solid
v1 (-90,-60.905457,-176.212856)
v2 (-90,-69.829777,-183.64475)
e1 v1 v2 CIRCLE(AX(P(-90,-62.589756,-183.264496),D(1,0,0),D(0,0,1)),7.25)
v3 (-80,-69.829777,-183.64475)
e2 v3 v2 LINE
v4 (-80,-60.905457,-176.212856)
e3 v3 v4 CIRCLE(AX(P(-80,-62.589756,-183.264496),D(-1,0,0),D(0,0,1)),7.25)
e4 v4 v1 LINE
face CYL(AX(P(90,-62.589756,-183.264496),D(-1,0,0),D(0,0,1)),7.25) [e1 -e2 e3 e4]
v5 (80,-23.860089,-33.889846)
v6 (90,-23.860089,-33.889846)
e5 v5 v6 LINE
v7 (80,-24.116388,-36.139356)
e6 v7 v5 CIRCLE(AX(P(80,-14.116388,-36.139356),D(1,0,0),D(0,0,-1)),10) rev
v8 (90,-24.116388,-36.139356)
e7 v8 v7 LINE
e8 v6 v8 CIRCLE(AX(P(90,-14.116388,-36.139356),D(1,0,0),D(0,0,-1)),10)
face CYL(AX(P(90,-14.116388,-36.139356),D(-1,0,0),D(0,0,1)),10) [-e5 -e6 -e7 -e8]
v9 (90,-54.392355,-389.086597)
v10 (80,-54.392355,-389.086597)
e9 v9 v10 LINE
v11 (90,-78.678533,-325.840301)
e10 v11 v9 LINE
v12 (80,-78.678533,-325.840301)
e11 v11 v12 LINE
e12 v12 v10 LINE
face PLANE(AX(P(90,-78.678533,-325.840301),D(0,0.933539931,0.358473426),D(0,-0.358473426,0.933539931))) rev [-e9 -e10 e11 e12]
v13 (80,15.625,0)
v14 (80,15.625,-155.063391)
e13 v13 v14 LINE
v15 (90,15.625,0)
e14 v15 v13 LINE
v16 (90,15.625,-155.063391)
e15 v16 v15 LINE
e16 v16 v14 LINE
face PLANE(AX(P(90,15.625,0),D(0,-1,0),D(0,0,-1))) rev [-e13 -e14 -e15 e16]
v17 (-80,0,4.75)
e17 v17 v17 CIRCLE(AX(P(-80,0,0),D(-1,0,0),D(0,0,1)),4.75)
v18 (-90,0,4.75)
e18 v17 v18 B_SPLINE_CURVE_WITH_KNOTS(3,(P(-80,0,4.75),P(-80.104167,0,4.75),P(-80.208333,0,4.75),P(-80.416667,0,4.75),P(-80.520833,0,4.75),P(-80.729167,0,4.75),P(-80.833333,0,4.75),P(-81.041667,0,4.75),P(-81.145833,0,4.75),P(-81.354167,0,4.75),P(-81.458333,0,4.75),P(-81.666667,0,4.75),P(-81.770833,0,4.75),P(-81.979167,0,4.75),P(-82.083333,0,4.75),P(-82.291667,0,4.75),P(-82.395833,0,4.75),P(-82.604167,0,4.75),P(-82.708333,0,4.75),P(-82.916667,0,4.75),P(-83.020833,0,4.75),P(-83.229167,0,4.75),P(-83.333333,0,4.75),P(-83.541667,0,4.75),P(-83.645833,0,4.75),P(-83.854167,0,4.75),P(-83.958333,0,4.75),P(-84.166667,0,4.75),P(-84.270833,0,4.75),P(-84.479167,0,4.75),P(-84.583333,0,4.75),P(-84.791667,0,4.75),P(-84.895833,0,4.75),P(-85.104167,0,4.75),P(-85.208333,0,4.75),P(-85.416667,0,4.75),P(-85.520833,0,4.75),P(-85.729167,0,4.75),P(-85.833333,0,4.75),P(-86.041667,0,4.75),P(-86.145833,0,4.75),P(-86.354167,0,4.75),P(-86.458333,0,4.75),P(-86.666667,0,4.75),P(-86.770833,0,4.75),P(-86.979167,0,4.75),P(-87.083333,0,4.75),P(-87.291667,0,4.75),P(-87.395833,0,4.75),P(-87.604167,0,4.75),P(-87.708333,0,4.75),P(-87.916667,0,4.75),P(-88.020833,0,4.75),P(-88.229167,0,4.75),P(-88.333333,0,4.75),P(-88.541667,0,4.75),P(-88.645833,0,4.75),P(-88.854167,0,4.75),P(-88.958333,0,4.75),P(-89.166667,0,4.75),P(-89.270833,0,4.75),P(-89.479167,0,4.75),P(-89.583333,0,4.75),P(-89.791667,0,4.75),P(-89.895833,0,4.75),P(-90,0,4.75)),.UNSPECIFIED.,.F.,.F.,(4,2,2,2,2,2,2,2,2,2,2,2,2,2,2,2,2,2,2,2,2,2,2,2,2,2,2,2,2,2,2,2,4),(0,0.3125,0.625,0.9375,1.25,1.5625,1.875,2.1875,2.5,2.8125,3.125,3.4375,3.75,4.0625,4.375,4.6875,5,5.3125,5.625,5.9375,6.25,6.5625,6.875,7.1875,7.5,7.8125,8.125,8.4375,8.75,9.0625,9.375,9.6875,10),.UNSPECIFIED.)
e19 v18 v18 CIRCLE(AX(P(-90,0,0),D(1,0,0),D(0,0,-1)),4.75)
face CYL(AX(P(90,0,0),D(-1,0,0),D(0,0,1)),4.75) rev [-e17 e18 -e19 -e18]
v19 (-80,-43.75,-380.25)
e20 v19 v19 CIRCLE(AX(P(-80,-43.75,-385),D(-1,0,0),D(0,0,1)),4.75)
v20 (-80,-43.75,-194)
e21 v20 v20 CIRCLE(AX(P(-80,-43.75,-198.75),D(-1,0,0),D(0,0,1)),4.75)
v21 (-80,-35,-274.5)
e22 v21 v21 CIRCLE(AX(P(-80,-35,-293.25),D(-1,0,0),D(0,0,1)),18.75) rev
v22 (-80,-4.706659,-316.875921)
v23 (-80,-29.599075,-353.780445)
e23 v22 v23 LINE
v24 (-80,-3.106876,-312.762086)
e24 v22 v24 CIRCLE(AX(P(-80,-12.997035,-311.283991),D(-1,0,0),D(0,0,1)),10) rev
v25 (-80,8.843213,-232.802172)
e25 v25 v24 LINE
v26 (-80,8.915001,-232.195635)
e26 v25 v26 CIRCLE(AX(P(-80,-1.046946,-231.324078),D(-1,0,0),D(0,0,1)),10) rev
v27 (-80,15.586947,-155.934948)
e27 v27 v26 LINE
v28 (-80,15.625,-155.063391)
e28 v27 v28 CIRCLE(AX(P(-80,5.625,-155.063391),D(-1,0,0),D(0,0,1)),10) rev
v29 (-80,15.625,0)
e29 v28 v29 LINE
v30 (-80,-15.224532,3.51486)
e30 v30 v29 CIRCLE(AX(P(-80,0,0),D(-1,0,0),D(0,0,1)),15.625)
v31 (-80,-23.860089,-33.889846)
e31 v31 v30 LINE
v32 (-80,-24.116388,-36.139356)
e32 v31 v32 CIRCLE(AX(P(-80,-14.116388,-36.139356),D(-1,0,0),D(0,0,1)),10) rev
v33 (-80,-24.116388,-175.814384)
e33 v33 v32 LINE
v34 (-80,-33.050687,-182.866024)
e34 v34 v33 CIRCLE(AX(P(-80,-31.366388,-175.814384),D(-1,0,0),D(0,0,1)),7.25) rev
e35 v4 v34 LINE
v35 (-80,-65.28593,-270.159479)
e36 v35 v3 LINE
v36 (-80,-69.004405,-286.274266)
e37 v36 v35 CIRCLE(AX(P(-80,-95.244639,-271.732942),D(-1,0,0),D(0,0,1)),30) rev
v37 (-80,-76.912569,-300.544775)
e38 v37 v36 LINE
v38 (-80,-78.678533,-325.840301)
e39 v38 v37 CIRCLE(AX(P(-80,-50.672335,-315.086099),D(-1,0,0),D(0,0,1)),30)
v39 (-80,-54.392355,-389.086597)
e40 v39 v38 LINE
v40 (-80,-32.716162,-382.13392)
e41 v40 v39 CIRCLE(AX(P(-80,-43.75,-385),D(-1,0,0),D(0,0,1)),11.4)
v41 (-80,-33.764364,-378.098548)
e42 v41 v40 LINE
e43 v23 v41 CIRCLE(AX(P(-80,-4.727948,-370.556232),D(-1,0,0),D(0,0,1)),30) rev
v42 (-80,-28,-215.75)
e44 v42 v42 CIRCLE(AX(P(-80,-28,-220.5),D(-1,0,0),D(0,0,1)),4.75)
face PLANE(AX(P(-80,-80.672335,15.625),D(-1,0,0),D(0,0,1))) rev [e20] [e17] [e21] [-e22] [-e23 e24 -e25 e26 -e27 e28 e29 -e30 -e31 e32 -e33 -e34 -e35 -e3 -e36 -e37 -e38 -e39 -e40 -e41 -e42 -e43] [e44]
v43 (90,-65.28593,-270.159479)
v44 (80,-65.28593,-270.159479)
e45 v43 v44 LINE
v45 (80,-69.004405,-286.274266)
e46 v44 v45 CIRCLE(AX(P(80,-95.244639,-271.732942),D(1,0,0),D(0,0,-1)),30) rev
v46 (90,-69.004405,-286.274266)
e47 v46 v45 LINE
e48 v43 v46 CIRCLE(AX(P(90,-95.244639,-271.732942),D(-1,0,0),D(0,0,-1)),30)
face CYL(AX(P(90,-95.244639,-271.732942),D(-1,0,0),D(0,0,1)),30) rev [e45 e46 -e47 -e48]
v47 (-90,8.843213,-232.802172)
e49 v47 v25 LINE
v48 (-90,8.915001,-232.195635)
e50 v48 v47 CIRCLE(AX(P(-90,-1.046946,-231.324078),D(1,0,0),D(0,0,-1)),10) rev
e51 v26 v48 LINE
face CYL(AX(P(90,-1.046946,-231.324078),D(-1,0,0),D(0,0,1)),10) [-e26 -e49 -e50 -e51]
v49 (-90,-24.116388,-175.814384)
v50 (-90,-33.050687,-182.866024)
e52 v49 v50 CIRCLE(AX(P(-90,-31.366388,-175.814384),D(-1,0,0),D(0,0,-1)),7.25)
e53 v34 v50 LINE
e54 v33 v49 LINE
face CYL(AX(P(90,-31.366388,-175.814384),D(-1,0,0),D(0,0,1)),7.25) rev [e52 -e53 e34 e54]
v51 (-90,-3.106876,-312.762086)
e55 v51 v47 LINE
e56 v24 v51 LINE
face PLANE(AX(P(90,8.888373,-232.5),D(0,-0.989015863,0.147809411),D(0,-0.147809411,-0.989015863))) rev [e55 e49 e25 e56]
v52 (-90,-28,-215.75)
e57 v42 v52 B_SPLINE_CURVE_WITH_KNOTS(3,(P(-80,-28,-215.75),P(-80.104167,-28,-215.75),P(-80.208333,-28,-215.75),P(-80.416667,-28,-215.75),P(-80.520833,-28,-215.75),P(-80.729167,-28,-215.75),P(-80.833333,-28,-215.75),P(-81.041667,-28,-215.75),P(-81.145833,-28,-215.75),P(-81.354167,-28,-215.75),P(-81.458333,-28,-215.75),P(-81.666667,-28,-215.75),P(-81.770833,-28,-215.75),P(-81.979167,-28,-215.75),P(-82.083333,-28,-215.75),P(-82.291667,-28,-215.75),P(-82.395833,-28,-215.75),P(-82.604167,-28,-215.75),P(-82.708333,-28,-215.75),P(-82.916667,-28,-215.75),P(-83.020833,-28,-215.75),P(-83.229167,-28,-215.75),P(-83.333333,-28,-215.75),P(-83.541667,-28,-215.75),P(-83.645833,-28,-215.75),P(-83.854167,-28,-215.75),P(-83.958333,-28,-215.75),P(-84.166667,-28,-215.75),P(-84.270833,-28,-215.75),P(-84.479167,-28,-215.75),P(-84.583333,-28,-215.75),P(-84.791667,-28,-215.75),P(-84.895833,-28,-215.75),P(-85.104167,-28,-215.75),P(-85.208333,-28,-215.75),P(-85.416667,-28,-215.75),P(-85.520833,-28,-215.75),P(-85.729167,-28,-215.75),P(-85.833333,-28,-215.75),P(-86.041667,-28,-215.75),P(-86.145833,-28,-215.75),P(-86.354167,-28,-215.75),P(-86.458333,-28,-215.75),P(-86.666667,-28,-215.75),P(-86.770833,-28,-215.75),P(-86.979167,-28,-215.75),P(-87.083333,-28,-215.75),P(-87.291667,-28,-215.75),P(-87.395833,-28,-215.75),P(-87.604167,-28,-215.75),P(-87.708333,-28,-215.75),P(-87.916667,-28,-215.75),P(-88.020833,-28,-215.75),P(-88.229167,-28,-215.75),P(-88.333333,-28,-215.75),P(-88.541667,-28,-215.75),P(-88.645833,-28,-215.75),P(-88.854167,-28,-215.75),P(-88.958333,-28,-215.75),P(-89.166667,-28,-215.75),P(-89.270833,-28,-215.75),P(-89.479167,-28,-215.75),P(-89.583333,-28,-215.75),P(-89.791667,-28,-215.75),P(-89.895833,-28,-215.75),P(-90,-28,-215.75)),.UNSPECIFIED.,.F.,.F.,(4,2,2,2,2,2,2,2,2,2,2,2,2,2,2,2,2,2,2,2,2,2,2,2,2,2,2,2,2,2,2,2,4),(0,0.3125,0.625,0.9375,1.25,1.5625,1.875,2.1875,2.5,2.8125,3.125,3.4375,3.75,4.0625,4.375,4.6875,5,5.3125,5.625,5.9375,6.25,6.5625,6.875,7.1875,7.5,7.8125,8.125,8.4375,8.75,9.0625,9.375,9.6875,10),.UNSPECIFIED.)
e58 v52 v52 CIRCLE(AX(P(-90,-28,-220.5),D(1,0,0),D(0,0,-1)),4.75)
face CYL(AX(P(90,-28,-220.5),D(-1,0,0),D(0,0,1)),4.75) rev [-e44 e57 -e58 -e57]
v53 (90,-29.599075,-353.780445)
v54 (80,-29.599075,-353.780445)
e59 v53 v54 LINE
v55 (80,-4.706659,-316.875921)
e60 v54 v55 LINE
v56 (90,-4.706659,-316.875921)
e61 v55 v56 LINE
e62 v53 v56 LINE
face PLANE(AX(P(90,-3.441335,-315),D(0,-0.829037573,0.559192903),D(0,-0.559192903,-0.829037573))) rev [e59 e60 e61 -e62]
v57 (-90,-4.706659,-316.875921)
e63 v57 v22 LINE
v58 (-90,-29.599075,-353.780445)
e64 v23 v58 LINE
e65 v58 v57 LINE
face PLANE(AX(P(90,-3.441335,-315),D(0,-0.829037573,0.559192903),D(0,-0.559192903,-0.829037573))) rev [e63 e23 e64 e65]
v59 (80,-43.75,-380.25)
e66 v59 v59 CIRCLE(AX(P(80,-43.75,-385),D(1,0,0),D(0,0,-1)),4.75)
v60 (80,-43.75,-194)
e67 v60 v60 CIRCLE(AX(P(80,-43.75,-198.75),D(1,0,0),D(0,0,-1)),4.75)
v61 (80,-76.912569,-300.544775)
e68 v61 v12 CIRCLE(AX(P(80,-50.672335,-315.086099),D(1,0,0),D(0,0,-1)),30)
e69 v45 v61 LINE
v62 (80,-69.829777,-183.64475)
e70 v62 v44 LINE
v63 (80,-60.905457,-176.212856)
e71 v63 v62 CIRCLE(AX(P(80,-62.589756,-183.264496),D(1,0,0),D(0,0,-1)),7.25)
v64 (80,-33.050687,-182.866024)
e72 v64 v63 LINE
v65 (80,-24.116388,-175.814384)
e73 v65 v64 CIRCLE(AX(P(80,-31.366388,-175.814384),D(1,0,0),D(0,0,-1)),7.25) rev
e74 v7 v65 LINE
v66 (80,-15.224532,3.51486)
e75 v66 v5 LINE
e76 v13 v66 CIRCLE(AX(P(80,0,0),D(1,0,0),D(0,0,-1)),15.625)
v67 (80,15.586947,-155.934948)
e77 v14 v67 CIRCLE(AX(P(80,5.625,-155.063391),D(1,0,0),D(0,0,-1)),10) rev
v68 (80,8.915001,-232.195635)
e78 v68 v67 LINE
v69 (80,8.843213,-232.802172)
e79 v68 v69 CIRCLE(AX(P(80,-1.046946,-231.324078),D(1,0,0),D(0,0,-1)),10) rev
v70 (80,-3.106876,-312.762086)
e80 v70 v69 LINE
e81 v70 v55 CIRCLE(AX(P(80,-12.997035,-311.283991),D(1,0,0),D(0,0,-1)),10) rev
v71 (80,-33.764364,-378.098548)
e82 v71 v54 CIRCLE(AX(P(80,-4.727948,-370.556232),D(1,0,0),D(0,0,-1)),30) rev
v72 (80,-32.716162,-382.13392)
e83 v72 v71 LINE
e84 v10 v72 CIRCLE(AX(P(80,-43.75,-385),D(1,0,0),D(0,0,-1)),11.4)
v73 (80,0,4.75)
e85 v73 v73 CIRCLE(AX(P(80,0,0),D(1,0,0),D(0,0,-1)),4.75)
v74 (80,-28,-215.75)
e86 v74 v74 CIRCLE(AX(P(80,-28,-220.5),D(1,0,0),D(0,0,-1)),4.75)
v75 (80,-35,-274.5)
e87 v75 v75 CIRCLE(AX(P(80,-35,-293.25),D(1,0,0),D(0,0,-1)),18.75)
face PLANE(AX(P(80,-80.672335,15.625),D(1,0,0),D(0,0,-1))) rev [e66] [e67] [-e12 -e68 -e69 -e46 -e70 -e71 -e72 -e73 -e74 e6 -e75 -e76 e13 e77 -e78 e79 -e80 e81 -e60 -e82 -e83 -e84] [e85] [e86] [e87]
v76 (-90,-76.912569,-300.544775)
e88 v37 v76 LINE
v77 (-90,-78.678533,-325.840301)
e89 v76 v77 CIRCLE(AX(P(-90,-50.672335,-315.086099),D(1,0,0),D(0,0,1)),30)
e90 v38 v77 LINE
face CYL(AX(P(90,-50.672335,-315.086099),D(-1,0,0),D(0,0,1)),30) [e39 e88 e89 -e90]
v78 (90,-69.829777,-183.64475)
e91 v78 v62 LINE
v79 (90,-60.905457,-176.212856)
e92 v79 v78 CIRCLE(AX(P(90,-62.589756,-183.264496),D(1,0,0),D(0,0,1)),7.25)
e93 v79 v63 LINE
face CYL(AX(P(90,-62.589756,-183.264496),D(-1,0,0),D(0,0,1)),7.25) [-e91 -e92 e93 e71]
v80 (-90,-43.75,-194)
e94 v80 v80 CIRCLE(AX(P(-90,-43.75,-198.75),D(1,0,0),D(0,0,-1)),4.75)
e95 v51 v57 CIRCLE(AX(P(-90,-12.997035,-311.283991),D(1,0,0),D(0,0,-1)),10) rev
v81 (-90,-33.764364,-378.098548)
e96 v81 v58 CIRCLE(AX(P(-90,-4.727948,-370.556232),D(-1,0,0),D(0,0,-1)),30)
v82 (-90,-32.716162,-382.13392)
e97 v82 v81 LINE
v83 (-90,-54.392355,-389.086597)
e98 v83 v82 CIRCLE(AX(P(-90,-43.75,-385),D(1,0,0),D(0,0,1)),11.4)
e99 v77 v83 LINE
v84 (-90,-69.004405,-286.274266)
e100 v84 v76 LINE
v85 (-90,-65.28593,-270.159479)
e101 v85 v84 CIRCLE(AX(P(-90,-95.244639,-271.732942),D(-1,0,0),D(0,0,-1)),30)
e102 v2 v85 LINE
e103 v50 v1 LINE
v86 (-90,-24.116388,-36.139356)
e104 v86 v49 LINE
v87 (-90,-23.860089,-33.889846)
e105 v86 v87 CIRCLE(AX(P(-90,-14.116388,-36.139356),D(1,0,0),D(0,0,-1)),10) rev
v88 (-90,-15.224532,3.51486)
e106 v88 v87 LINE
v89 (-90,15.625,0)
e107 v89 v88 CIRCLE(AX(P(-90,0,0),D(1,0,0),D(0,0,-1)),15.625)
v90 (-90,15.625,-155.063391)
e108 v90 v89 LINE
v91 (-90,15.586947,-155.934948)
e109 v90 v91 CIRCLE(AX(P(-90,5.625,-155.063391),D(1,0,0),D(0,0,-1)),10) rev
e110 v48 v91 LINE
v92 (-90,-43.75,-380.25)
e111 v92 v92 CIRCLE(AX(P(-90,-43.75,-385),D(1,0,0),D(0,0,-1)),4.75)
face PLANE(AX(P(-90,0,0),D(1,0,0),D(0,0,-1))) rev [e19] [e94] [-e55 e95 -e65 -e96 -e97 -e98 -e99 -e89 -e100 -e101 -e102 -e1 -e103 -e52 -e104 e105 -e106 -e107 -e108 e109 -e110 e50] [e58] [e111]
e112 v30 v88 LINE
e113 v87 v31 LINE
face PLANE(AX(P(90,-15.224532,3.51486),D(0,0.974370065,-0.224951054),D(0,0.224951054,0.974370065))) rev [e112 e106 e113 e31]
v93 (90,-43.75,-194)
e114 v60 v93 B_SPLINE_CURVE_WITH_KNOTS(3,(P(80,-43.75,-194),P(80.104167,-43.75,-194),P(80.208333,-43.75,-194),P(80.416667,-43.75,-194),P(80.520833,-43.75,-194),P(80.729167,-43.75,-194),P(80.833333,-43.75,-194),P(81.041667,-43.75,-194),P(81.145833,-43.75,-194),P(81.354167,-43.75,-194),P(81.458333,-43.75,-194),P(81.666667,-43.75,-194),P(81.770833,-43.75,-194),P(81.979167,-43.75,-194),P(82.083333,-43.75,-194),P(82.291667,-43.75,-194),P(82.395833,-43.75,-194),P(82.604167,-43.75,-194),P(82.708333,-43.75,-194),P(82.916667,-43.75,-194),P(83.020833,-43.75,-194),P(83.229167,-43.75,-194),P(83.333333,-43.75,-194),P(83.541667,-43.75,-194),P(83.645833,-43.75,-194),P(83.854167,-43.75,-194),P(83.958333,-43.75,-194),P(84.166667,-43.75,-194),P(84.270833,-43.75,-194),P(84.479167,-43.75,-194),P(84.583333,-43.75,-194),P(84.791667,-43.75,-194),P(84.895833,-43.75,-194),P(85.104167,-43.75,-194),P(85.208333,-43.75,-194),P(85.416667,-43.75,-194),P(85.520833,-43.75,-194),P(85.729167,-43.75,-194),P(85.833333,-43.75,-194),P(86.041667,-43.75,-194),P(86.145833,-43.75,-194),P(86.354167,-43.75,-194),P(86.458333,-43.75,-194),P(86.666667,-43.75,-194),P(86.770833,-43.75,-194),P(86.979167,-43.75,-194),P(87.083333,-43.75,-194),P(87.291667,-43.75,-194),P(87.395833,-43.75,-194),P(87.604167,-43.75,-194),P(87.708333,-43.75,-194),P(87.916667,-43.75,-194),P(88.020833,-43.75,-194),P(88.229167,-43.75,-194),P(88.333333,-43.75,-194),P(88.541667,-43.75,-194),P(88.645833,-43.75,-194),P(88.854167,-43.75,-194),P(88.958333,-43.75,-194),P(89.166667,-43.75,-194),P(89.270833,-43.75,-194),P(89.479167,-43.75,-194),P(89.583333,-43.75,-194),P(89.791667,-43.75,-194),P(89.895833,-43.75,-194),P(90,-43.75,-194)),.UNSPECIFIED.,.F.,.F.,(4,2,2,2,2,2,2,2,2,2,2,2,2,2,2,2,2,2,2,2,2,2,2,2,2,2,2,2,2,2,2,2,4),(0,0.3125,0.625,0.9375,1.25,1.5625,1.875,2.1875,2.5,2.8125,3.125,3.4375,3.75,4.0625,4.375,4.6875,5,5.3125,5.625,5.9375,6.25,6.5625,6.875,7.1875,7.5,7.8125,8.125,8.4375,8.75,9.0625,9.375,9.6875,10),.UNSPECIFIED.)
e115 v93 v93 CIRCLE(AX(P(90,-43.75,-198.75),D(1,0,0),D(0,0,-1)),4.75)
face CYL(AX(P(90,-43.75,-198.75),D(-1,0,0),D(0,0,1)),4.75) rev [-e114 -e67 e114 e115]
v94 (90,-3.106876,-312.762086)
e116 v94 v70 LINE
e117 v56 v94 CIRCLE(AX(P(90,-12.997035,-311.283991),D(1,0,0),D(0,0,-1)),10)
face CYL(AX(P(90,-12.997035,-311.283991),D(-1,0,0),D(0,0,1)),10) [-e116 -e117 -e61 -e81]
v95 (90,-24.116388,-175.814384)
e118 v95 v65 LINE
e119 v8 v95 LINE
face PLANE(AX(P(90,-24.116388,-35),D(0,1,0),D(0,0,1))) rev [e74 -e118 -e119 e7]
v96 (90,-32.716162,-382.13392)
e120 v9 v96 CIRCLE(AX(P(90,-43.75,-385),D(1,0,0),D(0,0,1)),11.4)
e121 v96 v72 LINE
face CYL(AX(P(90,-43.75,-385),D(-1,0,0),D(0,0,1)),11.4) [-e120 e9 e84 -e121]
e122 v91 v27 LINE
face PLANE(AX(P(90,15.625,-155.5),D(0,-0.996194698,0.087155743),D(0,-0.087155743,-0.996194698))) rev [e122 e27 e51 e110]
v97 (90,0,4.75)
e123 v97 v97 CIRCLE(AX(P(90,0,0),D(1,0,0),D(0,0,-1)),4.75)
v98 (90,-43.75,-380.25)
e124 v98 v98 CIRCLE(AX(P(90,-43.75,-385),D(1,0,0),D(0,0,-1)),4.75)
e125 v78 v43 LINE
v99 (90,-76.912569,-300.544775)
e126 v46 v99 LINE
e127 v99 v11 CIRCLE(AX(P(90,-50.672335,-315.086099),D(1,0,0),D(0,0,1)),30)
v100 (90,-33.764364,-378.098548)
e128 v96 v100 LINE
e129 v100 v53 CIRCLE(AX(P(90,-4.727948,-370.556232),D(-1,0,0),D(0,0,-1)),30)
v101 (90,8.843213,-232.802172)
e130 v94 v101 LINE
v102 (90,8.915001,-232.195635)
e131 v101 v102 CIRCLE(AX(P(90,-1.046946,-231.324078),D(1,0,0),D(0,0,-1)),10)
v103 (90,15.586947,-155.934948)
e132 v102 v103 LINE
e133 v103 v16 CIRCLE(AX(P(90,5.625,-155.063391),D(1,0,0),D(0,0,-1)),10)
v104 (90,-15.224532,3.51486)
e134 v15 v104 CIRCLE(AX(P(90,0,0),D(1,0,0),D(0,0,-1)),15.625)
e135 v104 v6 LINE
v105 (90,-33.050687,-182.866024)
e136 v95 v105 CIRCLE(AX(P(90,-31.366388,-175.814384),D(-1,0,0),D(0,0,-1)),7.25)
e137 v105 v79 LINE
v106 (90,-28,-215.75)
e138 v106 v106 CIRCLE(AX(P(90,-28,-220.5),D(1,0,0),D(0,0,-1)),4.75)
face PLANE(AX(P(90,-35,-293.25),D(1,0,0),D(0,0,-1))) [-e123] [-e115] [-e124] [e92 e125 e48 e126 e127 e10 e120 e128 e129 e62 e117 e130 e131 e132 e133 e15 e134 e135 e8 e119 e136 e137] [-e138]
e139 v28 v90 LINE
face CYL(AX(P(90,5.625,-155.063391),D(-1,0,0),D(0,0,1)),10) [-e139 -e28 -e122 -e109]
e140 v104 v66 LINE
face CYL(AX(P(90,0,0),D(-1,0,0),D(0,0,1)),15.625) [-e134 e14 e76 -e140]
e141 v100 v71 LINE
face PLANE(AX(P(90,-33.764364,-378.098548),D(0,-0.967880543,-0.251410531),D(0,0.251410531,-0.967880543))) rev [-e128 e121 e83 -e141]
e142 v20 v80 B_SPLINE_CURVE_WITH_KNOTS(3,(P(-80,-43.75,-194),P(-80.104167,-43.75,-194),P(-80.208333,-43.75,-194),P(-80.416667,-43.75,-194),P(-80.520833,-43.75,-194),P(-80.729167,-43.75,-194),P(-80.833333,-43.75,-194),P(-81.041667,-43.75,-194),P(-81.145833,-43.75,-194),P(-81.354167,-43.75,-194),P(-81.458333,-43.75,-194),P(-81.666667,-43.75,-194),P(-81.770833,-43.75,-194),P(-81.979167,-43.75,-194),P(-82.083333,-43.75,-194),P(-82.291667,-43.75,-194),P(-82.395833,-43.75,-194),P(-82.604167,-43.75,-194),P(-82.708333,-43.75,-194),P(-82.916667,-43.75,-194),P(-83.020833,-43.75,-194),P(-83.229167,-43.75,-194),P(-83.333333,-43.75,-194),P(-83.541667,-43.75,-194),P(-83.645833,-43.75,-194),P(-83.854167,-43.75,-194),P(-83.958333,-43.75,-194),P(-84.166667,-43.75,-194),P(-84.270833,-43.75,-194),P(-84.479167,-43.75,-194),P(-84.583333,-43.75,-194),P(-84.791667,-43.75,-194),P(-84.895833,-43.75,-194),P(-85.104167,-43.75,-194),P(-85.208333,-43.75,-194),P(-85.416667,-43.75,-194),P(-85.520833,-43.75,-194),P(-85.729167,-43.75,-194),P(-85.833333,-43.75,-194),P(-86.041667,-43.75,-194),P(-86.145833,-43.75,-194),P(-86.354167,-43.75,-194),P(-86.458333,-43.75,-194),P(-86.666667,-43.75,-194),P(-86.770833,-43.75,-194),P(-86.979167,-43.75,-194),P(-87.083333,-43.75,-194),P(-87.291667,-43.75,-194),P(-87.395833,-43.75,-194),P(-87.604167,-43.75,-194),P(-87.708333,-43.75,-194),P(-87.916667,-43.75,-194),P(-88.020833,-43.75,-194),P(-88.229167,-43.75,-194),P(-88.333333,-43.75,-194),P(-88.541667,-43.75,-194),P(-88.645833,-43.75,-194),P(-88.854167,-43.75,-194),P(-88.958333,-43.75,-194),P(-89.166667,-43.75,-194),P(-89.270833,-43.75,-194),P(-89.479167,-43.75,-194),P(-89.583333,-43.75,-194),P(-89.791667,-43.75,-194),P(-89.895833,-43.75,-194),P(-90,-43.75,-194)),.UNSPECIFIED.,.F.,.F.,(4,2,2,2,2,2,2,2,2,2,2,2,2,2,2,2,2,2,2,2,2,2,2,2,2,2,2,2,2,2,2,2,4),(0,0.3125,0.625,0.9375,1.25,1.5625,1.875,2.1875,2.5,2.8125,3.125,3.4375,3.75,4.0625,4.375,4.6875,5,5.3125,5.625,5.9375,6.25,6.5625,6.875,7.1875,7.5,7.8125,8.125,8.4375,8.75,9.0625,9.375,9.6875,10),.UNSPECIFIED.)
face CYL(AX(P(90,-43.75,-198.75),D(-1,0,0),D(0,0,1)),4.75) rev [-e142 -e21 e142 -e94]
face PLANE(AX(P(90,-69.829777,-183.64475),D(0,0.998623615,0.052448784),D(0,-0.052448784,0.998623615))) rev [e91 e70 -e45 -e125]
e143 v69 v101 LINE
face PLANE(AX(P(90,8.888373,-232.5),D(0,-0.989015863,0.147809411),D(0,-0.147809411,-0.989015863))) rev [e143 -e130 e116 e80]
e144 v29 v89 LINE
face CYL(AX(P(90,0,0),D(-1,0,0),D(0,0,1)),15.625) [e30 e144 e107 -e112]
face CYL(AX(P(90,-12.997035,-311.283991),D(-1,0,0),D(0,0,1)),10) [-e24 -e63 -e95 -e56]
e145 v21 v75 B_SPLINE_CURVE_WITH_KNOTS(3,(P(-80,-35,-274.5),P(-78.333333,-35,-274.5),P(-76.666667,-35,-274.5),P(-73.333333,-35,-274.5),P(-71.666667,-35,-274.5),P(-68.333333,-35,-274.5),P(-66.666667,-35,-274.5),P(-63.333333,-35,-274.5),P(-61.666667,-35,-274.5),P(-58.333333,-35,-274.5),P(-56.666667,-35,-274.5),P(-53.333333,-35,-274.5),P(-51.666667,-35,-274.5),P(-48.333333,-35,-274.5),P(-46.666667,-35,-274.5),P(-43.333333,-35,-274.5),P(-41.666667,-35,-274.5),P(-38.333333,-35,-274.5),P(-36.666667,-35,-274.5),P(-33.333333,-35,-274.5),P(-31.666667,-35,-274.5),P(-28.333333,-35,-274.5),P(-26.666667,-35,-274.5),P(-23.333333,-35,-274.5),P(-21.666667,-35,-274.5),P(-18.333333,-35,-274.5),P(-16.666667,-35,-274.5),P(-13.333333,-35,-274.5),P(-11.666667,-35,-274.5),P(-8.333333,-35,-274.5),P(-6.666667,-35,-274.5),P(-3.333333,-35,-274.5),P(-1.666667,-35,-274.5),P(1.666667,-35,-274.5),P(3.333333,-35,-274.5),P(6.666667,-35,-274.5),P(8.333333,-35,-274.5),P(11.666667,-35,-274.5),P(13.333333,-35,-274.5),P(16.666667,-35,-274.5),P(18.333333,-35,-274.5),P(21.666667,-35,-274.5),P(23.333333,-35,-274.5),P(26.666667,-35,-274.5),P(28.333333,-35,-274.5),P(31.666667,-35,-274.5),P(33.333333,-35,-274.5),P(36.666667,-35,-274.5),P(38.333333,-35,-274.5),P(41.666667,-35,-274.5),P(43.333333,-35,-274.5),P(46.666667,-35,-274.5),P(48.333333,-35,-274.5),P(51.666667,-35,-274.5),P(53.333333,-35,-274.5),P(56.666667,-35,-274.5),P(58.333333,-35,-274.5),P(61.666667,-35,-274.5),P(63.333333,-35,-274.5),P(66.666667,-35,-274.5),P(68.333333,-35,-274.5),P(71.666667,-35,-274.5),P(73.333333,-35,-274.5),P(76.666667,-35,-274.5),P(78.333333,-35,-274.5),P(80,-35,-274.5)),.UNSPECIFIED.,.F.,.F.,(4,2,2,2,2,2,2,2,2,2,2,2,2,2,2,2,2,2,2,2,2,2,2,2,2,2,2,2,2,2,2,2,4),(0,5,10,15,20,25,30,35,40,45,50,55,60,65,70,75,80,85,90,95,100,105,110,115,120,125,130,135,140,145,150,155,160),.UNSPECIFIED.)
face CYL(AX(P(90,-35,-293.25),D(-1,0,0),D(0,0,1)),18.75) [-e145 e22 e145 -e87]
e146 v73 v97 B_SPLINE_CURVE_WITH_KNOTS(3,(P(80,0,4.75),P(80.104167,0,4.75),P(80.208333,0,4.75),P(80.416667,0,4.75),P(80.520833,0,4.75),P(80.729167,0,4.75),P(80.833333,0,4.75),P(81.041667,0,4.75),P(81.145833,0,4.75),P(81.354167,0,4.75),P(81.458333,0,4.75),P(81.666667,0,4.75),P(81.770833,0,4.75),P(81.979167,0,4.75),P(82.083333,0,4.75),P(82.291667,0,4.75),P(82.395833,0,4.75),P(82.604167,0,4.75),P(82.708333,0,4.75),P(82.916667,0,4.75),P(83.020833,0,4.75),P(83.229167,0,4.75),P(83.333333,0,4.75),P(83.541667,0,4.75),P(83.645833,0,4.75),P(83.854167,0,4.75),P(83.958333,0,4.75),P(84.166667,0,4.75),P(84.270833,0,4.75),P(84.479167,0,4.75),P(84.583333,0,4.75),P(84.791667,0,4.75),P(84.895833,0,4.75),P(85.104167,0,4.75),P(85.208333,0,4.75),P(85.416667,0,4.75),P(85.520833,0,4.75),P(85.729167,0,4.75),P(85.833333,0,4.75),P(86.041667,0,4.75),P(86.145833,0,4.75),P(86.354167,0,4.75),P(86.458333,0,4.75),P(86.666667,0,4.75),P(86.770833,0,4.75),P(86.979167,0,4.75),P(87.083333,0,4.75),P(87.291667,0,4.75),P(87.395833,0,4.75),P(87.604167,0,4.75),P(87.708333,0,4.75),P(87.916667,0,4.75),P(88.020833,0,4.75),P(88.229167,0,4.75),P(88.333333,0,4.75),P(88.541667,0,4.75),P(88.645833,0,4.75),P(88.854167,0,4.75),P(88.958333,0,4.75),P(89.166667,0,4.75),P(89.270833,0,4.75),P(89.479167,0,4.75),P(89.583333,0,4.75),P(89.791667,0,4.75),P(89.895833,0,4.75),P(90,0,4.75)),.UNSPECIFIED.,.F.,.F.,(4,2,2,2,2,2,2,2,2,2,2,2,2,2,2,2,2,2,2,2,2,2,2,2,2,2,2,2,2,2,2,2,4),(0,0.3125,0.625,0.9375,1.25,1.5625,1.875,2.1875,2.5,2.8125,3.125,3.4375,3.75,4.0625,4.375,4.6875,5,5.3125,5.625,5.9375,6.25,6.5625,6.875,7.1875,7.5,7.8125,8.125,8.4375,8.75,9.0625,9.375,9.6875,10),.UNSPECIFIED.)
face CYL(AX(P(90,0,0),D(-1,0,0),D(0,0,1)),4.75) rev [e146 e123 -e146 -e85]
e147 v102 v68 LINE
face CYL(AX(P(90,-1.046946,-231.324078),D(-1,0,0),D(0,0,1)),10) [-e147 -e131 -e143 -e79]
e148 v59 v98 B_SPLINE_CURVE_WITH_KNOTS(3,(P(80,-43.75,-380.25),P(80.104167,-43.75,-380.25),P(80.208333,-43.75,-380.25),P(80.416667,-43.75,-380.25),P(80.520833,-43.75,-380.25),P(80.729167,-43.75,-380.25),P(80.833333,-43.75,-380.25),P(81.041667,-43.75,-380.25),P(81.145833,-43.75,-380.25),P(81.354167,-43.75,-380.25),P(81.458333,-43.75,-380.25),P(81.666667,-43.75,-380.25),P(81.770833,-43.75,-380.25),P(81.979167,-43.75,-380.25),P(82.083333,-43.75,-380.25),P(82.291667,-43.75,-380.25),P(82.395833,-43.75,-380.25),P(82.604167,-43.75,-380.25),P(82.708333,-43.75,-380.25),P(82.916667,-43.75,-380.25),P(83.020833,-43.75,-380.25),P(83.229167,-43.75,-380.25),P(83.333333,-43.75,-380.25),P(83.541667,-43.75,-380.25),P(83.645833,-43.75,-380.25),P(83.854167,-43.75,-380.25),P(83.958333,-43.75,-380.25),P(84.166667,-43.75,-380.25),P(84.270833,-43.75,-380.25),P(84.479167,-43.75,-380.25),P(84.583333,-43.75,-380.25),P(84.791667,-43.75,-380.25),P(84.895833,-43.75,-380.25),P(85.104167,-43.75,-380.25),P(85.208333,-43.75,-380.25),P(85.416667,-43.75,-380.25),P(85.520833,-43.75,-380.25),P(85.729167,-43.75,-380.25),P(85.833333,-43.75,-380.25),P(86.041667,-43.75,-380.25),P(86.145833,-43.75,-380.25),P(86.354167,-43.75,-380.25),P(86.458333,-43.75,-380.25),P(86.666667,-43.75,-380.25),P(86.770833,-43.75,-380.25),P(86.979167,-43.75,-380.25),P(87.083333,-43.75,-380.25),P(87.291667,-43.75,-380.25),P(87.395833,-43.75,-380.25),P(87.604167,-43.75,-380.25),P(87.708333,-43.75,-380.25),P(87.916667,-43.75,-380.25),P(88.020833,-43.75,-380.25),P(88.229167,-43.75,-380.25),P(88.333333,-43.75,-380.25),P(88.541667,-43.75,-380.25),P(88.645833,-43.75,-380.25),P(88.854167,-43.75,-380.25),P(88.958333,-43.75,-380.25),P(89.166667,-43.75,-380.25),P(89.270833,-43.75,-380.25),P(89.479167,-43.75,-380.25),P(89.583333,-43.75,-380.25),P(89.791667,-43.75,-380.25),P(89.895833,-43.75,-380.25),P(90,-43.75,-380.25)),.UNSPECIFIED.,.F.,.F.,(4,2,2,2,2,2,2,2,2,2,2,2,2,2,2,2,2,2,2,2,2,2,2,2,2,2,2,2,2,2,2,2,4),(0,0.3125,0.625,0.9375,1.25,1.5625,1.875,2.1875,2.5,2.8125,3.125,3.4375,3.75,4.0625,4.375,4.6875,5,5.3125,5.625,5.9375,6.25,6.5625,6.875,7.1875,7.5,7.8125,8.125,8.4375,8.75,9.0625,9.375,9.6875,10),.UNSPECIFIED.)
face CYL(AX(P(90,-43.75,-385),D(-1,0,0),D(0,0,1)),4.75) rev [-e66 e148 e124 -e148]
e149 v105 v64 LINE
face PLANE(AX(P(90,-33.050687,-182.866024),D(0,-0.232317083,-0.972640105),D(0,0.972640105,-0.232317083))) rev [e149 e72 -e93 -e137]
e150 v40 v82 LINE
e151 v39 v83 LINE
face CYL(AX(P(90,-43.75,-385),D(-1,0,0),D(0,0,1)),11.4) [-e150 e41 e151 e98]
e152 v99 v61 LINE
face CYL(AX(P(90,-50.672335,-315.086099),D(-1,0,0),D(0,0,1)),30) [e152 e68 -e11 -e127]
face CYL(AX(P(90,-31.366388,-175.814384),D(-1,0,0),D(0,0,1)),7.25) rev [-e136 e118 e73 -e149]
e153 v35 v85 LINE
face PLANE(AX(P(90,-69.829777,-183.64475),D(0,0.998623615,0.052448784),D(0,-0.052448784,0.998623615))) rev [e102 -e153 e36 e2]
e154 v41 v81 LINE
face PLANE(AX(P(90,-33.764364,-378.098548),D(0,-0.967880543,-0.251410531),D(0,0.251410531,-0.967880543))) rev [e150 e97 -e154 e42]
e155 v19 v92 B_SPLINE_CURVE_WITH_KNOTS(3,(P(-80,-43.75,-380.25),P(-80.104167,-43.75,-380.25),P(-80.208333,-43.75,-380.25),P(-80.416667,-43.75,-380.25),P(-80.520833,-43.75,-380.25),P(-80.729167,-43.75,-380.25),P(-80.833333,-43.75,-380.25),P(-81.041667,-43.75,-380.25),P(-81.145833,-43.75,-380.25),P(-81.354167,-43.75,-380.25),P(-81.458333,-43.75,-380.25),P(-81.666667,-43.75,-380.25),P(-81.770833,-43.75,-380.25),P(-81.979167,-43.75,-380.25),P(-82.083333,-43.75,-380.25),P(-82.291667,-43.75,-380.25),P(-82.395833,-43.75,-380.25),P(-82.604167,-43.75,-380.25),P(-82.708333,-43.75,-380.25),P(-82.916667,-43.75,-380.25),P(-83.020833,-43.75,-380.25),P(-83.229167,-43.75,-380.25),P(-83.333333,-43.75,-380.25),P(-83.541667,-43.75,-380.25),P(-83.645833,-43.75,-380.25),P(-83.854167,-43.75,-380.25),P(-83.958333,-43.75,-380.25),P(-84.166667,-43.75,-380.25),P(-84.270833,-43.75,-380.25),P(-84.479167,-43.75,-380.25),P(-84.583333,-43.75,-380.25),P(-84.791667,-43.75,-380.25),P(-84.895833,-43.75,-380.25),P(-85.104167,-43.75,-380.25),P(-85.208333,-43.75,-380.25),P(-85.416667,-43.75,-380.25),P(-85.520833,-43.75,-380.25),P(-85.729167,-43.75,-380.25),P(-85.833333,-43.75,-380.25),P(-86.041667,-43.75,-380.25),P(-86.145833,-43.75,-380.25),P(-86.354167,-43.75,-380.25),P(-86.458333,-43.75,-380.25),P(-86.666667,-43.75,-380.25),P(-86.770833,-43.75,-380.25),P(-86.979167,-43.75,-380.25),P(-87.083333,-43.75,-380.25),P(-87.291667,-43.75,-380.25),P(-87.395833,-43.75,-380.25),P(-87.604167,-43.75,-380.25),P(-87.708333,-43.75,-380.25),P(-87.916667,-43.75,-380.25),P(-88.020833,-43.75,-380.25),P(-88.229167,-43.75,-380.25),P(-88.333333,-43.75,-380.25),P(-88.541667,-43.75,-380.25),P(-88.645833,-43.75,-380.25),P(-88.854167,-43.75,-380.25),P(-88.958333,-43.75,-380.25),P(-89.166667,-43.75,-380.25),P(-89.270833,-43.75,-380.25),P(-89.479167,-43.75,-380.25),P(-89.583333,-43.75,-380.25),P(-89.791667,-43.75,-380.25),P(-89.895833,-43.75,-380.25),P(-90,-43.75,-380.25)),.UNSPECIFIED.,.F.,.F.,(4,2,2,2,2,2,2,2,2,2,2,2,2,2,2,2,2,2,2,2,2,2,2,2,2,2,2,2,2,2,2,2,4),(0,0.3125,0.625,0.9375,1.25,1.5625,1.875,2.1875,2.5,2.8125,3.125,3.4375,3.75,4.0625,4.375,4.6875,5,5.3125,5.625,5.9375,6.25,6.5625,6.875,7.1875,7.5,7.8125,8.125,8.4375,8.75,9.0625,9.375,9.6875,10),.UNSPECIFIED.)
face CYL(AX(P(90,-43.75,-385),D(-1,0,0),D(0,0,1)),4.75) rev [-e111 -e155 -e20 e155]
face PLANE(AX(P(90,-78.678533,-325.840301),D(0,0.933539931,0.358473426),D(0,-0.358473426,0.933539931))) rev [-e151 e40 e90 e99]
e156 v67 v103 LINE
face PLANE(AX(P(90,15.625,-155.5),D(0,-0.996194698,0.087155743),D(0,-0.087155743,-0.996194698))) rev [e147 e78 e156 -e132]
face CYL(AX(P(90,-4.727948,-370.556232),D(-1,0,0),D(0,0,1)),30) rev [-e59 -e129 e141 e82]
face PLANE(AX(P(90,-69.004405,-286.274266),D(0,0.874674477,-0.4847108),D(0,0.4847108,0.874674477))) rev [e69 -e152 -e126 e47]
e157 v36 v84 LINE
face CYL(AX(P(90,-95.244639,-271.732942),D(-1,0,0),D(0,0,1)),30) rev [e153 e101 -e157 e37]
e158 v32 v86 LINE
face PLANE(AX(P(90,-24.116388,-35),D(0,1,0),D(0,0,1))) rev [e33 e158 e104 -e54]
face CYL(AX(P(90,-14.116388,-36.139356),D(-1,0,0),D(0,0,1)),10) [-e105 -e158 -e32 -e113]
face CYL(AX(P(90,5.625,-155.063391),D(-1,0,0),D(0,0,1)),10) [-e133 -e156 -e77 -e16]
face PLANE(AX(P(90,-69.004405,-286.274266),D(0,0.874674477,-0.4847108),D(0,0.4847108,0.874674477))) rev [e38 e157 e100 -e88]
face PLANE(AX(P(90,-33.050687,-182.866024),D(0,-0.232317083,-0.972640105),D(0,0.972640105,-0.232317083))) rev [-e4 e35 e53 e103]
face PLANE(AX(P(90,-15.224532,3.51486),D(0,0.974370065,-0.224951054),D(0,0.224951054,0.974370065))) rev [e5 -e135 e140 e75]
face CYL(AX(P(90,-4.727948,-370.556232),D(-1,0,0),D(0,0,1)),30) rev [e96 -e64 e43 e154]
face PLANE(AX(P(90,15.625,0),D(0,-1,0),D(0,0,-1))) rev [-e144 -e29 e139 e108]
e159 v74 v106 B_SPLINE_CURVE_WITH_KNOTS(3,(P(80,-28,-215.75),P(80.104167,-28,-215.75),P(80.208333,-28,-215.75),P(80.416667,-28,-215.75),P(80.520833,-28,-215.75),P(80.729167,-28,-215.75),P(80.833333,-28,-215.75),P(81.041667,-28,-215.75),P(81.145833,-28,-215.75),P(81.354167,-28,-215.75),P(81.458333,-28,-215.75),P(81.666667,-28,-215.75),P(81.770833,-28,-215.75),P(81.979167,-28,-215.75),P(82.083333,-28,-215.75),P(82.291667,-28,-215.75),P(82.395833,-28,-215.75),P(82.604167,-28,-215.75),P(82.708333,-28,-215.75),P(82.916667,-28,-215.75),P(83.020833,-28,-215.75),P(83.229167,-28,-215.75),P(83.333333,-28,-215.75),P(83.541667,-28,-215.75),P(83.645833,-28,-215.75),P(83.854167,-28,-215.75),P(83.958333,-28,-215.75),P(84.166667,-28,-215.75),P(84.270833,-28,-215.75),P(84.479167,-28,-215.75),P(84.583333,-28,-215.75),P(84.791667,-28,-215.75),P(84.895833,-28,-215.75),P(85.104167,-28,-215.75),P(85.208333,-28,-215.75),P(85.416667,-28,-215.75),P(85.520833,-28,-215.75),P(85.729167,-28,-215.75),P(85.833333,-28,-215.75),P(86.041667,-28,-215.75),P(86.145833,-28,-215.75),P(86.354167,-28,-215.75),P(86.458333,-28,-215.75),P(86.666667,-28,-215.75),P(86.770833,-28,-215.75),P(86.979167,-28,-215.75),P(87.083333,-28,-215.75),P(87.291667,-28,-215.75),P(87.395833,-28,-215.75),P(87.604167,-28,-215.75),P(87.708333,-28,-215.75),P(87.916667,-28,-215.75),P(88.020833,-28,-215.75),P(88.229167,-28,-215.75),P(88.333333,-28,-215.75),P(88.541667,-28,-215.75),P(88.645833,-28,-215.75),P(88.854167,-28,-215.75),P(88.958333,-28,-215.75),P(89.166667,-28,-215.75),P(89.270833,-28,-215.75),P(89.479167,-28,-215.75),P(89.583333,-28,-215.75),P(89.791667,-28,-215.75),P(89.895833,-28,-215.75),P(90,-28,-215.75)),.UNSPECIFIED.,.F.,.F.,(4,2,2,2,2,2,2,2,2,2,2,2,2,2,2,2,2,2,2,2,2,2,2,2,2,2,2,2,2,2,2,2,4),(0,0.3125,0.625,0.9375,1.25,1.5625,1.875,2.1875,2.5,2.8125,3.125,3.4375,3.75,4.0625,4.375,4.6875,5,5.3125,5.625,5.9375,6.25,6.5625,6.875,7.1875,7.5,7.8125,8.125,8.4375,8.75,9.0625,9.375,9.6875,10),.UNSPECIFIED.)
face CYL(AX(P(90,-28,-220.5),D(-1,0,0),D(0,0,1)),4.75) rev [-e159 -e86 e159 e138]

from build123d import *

# Parameters (mm, degrees)
SKETCH1_R           = 4.75
BOSS_EXTRUDE1_DEPTH = 90
FILLET1_R           = 10
SKETCH4_W           = 160
SKETCH4_H           = 412.025
CUT_EXTRUDE2_DEPTH  = 418.739316622
SKETCH5_R           = 18.75
BOSS_EXTRUDE3_DEPTH = 90


with BuildPart() as part:
    # Sketch1 → Boss-Extrude1 (new, symmetric)
    with BuildSketch(Plane(origin=(0, 0, 0), x_dir=(0, 0, -1), z_dir=(1, 0, 0))):
        with BuildLine():
            Line((0, 15.625), (155.5, 15.625))
            Line((155.5, 15.625), (232.5, 8.888372909))
            Line((232.5, 8.888372909), (315, -3.441334703))
            Line((315, -3.441334703), (353.780445284, -29.599075334))
            ThreePointArc((353.780445284, -29.599075334), (365.491486019, -34.297330028), (378.098548324, -33.764364436))
            Line((378.098548324, -33.764364436), (382.133919944, -32.716161814))
            ThreePointArc((382.133919944, -32.716161814), (395.855263955, -40.268155018), (389.086597054, -54.392355215))
            Line((389.086597054, -54.392355215), (325.840301311, -78.678532537))
            ThreePointArc((325.840301311, -78.678532537), (312.996785566, -80.599492359), (300.544774533, -76.912568905))
            Line((300.544774533, -76.912568905), (286.274266107, -69.004404506))
            ThreePointArc((286.274266107, -69.004404506), (278.478171078, -66.012774583), (270.159478586, -65.285930348))
            Line((270.159478586, -65.285930348), (183.644750078, -69.829776728))
            ThreePointArc((183.644750078, -69.829776728), (177.69334539, -67.229235713), (176.212855636, -60.905456668))
            Line((176.212855636, -60.905456668), (182.866024409, -33.050687222))
            ThreePointArc((182.866024409, -33.050687222), (181.505326746, -26.874655225), (175.81438365, -24.116388374))
            Line((175.81438365, -24.116388374), (35, -24.116388374))
            Line((35, -24.116388374), (-3.514860224, -15.224532262))
            ThreePointArc((-3.514860224, -15.224532262), (-15.524560245, 1.768800215), (0, 15.625))
        make_face()
        with Locations(Location((0, 0, 0), (0, 0, 180))):
            Circle(SKETCH1_R, mode=Mode.SUBTRACT)
        with Locations(Location((198.75, -43.75, 0), (0, 0, 180))):
            Circle(SKETCH1_R, mode=Mode.SUBTRACT)
        with Locations(Location((220.5, -28, 0), (0, 0, 180))):
            Circle(SKETCH1_R, mode=Mode.SUBTRACT)
        with Locations(Location((385, -43.75, 0), (0, 0, 180))):
            Circle(SKETCH1_R, mode=Mode.SUBTRACT)
    extrude(amount=BOSS_EXTRUDE1_DEPTH, both=True)

    # Fillet1
    # the kernel refuses this fillet: 10 mm, written as the material it takes off along each edge
    with BuildSketch(Plane(origin=(91.091523573, 15.625, -155.5), x_dir=(0, 0, 1), z_dir=(-1, 0, 0))) as fillet1_piece_1:
        with BuildLine():
            CenterArc((FILLET1_R * 0.0436609429085, -FILLET1_R), FILLET1_R, 90, 5)
            Line((-FILLET1_R * 0.0434947998391, -FILLET1_R * 0.00380530190825), (0, 0))
            Line((0, 0), (FILLET1_R * 0.0436609429085, 0))
        make_face()
    extrude(amount=182.183047145, mode=Mode.SUBTRACT)
    with BuildSketch(Plane(origin=(90.763819082, 8.888372909, -232.5), x_dir=(0, -0.14780941112960186, -0.989015863361918), z_dir=(-1, 0, 0))) as fillet1_piece_2:
        with BuildLine():
            CenterArc((FILLET1_R * 0.0305527632986, FILLET1_R), FILLET1_R, 266.5, 3.5)
            Line((-FILLET1_R * 0.0304957762363, FILLET1_R * 0.00186520157813), (0, 0))
            Line((0, 0), (FILLET1_R * 0.0305527632986, 0))
        make_face()
    extrude(amount=181.527638165, mode=Mode.SUBTRACT)
    with BuildSketch(Plane(origin=(95.656922456, -3.441334703, -315), x_dir=(0, -0.5591929034707496, -0.8290375725550397), z_dir=(-1, 0, 0))) as fillet1_piece_3:
        with BuildLine():
            CenterArc((FILLET1_R * 0.226276898255, FILLET1_R), FILLET1_R, 244.5, 25.5)
            Line((-FILLET1_R * 0.204234198553, FILLET1_R * 0.0974147156501), (0, 0))
            Line((0, 0), (FILLET1_R * 0.226276898255, 0))
        make_face()
    extrude(amount=191.313844913, mode=Mode.SUBTRACT)
    with BuildSketch(Plane(origin=(-92.848390208, -24.116388374, -35), x_dir=(0, 0.2249510543438657, 0.9743700647852351), z_dir=(1, 0, 0))) as fillet1_piece_4:
        with BuildLine():
            CenterArc((FILLET1_R * 0.113935608302, -FILLET1_R), FILLET1_R, 90, 13)
            Line((-FILLET1_R * 0.111015446042, -FILLET1_R * 0.0256299352148), (0, 0))
            Line((0, 0), (FILLET1_R * 0.113935608302, 0))
        make_face()
    extrude(amount=185.696780415, mode=Mode.SUBTRACT)

    # Sketch4 → Cut-Extrude2 (cut, through all)
    with BuildSketch(Plane(origin=(0, 15.625, 0), x_dir=(1, 0, 0), z_dir=(0, 1, 0))):
        with Locations((0, 190.3875)):
            Rectangle(SKETCH4_W, SKETCH4_H)
    extrude(amount=-CUT_EXTRUDE2_DEPTH, mode=Mode.SUBTRACT)


with BuildPart() as cut_extrude2_piece_1:
    # of the separate pieces the step leaves, piece 1, a body of its own (cut_extrude2_pieces)
    add(part.part.solids().sort_by_distance((80, 15.625, 0))[0])



with BuildPart() as cut_extrude2_piece_2:
    # of the separate pieces the step leaves, piece 2, a body of its own (cut_extrude2_pieces)
    add(part.part.solids().sort_by_distance((-90, 15.625, 0))[0])


with BuildPart() as cut_extrude2_piece_1_1:
    add(cut_extrude2_piece_1.part)

    add(cut_extrude2_piece_2.part)  # Boss-Extrude3 merges Cut-Extrude2 piece 2
    # Sketch5 → Boss-Extrude3 (add, symmetric)
    with BuildSketch(Plane(origin=(0, 0, 0), x_dir=(0, 0, -1), z_dir=(1, 0, 0))):
        with Locations(Location((293.25, -35, 0), (0, 0, 180))):
            Circle(SKETCH5_R)
    extrude(amount=BOSS_EXTRUDE3_DEPTH, both=True)


solid = cut_extrude2_piece_1_1.part
